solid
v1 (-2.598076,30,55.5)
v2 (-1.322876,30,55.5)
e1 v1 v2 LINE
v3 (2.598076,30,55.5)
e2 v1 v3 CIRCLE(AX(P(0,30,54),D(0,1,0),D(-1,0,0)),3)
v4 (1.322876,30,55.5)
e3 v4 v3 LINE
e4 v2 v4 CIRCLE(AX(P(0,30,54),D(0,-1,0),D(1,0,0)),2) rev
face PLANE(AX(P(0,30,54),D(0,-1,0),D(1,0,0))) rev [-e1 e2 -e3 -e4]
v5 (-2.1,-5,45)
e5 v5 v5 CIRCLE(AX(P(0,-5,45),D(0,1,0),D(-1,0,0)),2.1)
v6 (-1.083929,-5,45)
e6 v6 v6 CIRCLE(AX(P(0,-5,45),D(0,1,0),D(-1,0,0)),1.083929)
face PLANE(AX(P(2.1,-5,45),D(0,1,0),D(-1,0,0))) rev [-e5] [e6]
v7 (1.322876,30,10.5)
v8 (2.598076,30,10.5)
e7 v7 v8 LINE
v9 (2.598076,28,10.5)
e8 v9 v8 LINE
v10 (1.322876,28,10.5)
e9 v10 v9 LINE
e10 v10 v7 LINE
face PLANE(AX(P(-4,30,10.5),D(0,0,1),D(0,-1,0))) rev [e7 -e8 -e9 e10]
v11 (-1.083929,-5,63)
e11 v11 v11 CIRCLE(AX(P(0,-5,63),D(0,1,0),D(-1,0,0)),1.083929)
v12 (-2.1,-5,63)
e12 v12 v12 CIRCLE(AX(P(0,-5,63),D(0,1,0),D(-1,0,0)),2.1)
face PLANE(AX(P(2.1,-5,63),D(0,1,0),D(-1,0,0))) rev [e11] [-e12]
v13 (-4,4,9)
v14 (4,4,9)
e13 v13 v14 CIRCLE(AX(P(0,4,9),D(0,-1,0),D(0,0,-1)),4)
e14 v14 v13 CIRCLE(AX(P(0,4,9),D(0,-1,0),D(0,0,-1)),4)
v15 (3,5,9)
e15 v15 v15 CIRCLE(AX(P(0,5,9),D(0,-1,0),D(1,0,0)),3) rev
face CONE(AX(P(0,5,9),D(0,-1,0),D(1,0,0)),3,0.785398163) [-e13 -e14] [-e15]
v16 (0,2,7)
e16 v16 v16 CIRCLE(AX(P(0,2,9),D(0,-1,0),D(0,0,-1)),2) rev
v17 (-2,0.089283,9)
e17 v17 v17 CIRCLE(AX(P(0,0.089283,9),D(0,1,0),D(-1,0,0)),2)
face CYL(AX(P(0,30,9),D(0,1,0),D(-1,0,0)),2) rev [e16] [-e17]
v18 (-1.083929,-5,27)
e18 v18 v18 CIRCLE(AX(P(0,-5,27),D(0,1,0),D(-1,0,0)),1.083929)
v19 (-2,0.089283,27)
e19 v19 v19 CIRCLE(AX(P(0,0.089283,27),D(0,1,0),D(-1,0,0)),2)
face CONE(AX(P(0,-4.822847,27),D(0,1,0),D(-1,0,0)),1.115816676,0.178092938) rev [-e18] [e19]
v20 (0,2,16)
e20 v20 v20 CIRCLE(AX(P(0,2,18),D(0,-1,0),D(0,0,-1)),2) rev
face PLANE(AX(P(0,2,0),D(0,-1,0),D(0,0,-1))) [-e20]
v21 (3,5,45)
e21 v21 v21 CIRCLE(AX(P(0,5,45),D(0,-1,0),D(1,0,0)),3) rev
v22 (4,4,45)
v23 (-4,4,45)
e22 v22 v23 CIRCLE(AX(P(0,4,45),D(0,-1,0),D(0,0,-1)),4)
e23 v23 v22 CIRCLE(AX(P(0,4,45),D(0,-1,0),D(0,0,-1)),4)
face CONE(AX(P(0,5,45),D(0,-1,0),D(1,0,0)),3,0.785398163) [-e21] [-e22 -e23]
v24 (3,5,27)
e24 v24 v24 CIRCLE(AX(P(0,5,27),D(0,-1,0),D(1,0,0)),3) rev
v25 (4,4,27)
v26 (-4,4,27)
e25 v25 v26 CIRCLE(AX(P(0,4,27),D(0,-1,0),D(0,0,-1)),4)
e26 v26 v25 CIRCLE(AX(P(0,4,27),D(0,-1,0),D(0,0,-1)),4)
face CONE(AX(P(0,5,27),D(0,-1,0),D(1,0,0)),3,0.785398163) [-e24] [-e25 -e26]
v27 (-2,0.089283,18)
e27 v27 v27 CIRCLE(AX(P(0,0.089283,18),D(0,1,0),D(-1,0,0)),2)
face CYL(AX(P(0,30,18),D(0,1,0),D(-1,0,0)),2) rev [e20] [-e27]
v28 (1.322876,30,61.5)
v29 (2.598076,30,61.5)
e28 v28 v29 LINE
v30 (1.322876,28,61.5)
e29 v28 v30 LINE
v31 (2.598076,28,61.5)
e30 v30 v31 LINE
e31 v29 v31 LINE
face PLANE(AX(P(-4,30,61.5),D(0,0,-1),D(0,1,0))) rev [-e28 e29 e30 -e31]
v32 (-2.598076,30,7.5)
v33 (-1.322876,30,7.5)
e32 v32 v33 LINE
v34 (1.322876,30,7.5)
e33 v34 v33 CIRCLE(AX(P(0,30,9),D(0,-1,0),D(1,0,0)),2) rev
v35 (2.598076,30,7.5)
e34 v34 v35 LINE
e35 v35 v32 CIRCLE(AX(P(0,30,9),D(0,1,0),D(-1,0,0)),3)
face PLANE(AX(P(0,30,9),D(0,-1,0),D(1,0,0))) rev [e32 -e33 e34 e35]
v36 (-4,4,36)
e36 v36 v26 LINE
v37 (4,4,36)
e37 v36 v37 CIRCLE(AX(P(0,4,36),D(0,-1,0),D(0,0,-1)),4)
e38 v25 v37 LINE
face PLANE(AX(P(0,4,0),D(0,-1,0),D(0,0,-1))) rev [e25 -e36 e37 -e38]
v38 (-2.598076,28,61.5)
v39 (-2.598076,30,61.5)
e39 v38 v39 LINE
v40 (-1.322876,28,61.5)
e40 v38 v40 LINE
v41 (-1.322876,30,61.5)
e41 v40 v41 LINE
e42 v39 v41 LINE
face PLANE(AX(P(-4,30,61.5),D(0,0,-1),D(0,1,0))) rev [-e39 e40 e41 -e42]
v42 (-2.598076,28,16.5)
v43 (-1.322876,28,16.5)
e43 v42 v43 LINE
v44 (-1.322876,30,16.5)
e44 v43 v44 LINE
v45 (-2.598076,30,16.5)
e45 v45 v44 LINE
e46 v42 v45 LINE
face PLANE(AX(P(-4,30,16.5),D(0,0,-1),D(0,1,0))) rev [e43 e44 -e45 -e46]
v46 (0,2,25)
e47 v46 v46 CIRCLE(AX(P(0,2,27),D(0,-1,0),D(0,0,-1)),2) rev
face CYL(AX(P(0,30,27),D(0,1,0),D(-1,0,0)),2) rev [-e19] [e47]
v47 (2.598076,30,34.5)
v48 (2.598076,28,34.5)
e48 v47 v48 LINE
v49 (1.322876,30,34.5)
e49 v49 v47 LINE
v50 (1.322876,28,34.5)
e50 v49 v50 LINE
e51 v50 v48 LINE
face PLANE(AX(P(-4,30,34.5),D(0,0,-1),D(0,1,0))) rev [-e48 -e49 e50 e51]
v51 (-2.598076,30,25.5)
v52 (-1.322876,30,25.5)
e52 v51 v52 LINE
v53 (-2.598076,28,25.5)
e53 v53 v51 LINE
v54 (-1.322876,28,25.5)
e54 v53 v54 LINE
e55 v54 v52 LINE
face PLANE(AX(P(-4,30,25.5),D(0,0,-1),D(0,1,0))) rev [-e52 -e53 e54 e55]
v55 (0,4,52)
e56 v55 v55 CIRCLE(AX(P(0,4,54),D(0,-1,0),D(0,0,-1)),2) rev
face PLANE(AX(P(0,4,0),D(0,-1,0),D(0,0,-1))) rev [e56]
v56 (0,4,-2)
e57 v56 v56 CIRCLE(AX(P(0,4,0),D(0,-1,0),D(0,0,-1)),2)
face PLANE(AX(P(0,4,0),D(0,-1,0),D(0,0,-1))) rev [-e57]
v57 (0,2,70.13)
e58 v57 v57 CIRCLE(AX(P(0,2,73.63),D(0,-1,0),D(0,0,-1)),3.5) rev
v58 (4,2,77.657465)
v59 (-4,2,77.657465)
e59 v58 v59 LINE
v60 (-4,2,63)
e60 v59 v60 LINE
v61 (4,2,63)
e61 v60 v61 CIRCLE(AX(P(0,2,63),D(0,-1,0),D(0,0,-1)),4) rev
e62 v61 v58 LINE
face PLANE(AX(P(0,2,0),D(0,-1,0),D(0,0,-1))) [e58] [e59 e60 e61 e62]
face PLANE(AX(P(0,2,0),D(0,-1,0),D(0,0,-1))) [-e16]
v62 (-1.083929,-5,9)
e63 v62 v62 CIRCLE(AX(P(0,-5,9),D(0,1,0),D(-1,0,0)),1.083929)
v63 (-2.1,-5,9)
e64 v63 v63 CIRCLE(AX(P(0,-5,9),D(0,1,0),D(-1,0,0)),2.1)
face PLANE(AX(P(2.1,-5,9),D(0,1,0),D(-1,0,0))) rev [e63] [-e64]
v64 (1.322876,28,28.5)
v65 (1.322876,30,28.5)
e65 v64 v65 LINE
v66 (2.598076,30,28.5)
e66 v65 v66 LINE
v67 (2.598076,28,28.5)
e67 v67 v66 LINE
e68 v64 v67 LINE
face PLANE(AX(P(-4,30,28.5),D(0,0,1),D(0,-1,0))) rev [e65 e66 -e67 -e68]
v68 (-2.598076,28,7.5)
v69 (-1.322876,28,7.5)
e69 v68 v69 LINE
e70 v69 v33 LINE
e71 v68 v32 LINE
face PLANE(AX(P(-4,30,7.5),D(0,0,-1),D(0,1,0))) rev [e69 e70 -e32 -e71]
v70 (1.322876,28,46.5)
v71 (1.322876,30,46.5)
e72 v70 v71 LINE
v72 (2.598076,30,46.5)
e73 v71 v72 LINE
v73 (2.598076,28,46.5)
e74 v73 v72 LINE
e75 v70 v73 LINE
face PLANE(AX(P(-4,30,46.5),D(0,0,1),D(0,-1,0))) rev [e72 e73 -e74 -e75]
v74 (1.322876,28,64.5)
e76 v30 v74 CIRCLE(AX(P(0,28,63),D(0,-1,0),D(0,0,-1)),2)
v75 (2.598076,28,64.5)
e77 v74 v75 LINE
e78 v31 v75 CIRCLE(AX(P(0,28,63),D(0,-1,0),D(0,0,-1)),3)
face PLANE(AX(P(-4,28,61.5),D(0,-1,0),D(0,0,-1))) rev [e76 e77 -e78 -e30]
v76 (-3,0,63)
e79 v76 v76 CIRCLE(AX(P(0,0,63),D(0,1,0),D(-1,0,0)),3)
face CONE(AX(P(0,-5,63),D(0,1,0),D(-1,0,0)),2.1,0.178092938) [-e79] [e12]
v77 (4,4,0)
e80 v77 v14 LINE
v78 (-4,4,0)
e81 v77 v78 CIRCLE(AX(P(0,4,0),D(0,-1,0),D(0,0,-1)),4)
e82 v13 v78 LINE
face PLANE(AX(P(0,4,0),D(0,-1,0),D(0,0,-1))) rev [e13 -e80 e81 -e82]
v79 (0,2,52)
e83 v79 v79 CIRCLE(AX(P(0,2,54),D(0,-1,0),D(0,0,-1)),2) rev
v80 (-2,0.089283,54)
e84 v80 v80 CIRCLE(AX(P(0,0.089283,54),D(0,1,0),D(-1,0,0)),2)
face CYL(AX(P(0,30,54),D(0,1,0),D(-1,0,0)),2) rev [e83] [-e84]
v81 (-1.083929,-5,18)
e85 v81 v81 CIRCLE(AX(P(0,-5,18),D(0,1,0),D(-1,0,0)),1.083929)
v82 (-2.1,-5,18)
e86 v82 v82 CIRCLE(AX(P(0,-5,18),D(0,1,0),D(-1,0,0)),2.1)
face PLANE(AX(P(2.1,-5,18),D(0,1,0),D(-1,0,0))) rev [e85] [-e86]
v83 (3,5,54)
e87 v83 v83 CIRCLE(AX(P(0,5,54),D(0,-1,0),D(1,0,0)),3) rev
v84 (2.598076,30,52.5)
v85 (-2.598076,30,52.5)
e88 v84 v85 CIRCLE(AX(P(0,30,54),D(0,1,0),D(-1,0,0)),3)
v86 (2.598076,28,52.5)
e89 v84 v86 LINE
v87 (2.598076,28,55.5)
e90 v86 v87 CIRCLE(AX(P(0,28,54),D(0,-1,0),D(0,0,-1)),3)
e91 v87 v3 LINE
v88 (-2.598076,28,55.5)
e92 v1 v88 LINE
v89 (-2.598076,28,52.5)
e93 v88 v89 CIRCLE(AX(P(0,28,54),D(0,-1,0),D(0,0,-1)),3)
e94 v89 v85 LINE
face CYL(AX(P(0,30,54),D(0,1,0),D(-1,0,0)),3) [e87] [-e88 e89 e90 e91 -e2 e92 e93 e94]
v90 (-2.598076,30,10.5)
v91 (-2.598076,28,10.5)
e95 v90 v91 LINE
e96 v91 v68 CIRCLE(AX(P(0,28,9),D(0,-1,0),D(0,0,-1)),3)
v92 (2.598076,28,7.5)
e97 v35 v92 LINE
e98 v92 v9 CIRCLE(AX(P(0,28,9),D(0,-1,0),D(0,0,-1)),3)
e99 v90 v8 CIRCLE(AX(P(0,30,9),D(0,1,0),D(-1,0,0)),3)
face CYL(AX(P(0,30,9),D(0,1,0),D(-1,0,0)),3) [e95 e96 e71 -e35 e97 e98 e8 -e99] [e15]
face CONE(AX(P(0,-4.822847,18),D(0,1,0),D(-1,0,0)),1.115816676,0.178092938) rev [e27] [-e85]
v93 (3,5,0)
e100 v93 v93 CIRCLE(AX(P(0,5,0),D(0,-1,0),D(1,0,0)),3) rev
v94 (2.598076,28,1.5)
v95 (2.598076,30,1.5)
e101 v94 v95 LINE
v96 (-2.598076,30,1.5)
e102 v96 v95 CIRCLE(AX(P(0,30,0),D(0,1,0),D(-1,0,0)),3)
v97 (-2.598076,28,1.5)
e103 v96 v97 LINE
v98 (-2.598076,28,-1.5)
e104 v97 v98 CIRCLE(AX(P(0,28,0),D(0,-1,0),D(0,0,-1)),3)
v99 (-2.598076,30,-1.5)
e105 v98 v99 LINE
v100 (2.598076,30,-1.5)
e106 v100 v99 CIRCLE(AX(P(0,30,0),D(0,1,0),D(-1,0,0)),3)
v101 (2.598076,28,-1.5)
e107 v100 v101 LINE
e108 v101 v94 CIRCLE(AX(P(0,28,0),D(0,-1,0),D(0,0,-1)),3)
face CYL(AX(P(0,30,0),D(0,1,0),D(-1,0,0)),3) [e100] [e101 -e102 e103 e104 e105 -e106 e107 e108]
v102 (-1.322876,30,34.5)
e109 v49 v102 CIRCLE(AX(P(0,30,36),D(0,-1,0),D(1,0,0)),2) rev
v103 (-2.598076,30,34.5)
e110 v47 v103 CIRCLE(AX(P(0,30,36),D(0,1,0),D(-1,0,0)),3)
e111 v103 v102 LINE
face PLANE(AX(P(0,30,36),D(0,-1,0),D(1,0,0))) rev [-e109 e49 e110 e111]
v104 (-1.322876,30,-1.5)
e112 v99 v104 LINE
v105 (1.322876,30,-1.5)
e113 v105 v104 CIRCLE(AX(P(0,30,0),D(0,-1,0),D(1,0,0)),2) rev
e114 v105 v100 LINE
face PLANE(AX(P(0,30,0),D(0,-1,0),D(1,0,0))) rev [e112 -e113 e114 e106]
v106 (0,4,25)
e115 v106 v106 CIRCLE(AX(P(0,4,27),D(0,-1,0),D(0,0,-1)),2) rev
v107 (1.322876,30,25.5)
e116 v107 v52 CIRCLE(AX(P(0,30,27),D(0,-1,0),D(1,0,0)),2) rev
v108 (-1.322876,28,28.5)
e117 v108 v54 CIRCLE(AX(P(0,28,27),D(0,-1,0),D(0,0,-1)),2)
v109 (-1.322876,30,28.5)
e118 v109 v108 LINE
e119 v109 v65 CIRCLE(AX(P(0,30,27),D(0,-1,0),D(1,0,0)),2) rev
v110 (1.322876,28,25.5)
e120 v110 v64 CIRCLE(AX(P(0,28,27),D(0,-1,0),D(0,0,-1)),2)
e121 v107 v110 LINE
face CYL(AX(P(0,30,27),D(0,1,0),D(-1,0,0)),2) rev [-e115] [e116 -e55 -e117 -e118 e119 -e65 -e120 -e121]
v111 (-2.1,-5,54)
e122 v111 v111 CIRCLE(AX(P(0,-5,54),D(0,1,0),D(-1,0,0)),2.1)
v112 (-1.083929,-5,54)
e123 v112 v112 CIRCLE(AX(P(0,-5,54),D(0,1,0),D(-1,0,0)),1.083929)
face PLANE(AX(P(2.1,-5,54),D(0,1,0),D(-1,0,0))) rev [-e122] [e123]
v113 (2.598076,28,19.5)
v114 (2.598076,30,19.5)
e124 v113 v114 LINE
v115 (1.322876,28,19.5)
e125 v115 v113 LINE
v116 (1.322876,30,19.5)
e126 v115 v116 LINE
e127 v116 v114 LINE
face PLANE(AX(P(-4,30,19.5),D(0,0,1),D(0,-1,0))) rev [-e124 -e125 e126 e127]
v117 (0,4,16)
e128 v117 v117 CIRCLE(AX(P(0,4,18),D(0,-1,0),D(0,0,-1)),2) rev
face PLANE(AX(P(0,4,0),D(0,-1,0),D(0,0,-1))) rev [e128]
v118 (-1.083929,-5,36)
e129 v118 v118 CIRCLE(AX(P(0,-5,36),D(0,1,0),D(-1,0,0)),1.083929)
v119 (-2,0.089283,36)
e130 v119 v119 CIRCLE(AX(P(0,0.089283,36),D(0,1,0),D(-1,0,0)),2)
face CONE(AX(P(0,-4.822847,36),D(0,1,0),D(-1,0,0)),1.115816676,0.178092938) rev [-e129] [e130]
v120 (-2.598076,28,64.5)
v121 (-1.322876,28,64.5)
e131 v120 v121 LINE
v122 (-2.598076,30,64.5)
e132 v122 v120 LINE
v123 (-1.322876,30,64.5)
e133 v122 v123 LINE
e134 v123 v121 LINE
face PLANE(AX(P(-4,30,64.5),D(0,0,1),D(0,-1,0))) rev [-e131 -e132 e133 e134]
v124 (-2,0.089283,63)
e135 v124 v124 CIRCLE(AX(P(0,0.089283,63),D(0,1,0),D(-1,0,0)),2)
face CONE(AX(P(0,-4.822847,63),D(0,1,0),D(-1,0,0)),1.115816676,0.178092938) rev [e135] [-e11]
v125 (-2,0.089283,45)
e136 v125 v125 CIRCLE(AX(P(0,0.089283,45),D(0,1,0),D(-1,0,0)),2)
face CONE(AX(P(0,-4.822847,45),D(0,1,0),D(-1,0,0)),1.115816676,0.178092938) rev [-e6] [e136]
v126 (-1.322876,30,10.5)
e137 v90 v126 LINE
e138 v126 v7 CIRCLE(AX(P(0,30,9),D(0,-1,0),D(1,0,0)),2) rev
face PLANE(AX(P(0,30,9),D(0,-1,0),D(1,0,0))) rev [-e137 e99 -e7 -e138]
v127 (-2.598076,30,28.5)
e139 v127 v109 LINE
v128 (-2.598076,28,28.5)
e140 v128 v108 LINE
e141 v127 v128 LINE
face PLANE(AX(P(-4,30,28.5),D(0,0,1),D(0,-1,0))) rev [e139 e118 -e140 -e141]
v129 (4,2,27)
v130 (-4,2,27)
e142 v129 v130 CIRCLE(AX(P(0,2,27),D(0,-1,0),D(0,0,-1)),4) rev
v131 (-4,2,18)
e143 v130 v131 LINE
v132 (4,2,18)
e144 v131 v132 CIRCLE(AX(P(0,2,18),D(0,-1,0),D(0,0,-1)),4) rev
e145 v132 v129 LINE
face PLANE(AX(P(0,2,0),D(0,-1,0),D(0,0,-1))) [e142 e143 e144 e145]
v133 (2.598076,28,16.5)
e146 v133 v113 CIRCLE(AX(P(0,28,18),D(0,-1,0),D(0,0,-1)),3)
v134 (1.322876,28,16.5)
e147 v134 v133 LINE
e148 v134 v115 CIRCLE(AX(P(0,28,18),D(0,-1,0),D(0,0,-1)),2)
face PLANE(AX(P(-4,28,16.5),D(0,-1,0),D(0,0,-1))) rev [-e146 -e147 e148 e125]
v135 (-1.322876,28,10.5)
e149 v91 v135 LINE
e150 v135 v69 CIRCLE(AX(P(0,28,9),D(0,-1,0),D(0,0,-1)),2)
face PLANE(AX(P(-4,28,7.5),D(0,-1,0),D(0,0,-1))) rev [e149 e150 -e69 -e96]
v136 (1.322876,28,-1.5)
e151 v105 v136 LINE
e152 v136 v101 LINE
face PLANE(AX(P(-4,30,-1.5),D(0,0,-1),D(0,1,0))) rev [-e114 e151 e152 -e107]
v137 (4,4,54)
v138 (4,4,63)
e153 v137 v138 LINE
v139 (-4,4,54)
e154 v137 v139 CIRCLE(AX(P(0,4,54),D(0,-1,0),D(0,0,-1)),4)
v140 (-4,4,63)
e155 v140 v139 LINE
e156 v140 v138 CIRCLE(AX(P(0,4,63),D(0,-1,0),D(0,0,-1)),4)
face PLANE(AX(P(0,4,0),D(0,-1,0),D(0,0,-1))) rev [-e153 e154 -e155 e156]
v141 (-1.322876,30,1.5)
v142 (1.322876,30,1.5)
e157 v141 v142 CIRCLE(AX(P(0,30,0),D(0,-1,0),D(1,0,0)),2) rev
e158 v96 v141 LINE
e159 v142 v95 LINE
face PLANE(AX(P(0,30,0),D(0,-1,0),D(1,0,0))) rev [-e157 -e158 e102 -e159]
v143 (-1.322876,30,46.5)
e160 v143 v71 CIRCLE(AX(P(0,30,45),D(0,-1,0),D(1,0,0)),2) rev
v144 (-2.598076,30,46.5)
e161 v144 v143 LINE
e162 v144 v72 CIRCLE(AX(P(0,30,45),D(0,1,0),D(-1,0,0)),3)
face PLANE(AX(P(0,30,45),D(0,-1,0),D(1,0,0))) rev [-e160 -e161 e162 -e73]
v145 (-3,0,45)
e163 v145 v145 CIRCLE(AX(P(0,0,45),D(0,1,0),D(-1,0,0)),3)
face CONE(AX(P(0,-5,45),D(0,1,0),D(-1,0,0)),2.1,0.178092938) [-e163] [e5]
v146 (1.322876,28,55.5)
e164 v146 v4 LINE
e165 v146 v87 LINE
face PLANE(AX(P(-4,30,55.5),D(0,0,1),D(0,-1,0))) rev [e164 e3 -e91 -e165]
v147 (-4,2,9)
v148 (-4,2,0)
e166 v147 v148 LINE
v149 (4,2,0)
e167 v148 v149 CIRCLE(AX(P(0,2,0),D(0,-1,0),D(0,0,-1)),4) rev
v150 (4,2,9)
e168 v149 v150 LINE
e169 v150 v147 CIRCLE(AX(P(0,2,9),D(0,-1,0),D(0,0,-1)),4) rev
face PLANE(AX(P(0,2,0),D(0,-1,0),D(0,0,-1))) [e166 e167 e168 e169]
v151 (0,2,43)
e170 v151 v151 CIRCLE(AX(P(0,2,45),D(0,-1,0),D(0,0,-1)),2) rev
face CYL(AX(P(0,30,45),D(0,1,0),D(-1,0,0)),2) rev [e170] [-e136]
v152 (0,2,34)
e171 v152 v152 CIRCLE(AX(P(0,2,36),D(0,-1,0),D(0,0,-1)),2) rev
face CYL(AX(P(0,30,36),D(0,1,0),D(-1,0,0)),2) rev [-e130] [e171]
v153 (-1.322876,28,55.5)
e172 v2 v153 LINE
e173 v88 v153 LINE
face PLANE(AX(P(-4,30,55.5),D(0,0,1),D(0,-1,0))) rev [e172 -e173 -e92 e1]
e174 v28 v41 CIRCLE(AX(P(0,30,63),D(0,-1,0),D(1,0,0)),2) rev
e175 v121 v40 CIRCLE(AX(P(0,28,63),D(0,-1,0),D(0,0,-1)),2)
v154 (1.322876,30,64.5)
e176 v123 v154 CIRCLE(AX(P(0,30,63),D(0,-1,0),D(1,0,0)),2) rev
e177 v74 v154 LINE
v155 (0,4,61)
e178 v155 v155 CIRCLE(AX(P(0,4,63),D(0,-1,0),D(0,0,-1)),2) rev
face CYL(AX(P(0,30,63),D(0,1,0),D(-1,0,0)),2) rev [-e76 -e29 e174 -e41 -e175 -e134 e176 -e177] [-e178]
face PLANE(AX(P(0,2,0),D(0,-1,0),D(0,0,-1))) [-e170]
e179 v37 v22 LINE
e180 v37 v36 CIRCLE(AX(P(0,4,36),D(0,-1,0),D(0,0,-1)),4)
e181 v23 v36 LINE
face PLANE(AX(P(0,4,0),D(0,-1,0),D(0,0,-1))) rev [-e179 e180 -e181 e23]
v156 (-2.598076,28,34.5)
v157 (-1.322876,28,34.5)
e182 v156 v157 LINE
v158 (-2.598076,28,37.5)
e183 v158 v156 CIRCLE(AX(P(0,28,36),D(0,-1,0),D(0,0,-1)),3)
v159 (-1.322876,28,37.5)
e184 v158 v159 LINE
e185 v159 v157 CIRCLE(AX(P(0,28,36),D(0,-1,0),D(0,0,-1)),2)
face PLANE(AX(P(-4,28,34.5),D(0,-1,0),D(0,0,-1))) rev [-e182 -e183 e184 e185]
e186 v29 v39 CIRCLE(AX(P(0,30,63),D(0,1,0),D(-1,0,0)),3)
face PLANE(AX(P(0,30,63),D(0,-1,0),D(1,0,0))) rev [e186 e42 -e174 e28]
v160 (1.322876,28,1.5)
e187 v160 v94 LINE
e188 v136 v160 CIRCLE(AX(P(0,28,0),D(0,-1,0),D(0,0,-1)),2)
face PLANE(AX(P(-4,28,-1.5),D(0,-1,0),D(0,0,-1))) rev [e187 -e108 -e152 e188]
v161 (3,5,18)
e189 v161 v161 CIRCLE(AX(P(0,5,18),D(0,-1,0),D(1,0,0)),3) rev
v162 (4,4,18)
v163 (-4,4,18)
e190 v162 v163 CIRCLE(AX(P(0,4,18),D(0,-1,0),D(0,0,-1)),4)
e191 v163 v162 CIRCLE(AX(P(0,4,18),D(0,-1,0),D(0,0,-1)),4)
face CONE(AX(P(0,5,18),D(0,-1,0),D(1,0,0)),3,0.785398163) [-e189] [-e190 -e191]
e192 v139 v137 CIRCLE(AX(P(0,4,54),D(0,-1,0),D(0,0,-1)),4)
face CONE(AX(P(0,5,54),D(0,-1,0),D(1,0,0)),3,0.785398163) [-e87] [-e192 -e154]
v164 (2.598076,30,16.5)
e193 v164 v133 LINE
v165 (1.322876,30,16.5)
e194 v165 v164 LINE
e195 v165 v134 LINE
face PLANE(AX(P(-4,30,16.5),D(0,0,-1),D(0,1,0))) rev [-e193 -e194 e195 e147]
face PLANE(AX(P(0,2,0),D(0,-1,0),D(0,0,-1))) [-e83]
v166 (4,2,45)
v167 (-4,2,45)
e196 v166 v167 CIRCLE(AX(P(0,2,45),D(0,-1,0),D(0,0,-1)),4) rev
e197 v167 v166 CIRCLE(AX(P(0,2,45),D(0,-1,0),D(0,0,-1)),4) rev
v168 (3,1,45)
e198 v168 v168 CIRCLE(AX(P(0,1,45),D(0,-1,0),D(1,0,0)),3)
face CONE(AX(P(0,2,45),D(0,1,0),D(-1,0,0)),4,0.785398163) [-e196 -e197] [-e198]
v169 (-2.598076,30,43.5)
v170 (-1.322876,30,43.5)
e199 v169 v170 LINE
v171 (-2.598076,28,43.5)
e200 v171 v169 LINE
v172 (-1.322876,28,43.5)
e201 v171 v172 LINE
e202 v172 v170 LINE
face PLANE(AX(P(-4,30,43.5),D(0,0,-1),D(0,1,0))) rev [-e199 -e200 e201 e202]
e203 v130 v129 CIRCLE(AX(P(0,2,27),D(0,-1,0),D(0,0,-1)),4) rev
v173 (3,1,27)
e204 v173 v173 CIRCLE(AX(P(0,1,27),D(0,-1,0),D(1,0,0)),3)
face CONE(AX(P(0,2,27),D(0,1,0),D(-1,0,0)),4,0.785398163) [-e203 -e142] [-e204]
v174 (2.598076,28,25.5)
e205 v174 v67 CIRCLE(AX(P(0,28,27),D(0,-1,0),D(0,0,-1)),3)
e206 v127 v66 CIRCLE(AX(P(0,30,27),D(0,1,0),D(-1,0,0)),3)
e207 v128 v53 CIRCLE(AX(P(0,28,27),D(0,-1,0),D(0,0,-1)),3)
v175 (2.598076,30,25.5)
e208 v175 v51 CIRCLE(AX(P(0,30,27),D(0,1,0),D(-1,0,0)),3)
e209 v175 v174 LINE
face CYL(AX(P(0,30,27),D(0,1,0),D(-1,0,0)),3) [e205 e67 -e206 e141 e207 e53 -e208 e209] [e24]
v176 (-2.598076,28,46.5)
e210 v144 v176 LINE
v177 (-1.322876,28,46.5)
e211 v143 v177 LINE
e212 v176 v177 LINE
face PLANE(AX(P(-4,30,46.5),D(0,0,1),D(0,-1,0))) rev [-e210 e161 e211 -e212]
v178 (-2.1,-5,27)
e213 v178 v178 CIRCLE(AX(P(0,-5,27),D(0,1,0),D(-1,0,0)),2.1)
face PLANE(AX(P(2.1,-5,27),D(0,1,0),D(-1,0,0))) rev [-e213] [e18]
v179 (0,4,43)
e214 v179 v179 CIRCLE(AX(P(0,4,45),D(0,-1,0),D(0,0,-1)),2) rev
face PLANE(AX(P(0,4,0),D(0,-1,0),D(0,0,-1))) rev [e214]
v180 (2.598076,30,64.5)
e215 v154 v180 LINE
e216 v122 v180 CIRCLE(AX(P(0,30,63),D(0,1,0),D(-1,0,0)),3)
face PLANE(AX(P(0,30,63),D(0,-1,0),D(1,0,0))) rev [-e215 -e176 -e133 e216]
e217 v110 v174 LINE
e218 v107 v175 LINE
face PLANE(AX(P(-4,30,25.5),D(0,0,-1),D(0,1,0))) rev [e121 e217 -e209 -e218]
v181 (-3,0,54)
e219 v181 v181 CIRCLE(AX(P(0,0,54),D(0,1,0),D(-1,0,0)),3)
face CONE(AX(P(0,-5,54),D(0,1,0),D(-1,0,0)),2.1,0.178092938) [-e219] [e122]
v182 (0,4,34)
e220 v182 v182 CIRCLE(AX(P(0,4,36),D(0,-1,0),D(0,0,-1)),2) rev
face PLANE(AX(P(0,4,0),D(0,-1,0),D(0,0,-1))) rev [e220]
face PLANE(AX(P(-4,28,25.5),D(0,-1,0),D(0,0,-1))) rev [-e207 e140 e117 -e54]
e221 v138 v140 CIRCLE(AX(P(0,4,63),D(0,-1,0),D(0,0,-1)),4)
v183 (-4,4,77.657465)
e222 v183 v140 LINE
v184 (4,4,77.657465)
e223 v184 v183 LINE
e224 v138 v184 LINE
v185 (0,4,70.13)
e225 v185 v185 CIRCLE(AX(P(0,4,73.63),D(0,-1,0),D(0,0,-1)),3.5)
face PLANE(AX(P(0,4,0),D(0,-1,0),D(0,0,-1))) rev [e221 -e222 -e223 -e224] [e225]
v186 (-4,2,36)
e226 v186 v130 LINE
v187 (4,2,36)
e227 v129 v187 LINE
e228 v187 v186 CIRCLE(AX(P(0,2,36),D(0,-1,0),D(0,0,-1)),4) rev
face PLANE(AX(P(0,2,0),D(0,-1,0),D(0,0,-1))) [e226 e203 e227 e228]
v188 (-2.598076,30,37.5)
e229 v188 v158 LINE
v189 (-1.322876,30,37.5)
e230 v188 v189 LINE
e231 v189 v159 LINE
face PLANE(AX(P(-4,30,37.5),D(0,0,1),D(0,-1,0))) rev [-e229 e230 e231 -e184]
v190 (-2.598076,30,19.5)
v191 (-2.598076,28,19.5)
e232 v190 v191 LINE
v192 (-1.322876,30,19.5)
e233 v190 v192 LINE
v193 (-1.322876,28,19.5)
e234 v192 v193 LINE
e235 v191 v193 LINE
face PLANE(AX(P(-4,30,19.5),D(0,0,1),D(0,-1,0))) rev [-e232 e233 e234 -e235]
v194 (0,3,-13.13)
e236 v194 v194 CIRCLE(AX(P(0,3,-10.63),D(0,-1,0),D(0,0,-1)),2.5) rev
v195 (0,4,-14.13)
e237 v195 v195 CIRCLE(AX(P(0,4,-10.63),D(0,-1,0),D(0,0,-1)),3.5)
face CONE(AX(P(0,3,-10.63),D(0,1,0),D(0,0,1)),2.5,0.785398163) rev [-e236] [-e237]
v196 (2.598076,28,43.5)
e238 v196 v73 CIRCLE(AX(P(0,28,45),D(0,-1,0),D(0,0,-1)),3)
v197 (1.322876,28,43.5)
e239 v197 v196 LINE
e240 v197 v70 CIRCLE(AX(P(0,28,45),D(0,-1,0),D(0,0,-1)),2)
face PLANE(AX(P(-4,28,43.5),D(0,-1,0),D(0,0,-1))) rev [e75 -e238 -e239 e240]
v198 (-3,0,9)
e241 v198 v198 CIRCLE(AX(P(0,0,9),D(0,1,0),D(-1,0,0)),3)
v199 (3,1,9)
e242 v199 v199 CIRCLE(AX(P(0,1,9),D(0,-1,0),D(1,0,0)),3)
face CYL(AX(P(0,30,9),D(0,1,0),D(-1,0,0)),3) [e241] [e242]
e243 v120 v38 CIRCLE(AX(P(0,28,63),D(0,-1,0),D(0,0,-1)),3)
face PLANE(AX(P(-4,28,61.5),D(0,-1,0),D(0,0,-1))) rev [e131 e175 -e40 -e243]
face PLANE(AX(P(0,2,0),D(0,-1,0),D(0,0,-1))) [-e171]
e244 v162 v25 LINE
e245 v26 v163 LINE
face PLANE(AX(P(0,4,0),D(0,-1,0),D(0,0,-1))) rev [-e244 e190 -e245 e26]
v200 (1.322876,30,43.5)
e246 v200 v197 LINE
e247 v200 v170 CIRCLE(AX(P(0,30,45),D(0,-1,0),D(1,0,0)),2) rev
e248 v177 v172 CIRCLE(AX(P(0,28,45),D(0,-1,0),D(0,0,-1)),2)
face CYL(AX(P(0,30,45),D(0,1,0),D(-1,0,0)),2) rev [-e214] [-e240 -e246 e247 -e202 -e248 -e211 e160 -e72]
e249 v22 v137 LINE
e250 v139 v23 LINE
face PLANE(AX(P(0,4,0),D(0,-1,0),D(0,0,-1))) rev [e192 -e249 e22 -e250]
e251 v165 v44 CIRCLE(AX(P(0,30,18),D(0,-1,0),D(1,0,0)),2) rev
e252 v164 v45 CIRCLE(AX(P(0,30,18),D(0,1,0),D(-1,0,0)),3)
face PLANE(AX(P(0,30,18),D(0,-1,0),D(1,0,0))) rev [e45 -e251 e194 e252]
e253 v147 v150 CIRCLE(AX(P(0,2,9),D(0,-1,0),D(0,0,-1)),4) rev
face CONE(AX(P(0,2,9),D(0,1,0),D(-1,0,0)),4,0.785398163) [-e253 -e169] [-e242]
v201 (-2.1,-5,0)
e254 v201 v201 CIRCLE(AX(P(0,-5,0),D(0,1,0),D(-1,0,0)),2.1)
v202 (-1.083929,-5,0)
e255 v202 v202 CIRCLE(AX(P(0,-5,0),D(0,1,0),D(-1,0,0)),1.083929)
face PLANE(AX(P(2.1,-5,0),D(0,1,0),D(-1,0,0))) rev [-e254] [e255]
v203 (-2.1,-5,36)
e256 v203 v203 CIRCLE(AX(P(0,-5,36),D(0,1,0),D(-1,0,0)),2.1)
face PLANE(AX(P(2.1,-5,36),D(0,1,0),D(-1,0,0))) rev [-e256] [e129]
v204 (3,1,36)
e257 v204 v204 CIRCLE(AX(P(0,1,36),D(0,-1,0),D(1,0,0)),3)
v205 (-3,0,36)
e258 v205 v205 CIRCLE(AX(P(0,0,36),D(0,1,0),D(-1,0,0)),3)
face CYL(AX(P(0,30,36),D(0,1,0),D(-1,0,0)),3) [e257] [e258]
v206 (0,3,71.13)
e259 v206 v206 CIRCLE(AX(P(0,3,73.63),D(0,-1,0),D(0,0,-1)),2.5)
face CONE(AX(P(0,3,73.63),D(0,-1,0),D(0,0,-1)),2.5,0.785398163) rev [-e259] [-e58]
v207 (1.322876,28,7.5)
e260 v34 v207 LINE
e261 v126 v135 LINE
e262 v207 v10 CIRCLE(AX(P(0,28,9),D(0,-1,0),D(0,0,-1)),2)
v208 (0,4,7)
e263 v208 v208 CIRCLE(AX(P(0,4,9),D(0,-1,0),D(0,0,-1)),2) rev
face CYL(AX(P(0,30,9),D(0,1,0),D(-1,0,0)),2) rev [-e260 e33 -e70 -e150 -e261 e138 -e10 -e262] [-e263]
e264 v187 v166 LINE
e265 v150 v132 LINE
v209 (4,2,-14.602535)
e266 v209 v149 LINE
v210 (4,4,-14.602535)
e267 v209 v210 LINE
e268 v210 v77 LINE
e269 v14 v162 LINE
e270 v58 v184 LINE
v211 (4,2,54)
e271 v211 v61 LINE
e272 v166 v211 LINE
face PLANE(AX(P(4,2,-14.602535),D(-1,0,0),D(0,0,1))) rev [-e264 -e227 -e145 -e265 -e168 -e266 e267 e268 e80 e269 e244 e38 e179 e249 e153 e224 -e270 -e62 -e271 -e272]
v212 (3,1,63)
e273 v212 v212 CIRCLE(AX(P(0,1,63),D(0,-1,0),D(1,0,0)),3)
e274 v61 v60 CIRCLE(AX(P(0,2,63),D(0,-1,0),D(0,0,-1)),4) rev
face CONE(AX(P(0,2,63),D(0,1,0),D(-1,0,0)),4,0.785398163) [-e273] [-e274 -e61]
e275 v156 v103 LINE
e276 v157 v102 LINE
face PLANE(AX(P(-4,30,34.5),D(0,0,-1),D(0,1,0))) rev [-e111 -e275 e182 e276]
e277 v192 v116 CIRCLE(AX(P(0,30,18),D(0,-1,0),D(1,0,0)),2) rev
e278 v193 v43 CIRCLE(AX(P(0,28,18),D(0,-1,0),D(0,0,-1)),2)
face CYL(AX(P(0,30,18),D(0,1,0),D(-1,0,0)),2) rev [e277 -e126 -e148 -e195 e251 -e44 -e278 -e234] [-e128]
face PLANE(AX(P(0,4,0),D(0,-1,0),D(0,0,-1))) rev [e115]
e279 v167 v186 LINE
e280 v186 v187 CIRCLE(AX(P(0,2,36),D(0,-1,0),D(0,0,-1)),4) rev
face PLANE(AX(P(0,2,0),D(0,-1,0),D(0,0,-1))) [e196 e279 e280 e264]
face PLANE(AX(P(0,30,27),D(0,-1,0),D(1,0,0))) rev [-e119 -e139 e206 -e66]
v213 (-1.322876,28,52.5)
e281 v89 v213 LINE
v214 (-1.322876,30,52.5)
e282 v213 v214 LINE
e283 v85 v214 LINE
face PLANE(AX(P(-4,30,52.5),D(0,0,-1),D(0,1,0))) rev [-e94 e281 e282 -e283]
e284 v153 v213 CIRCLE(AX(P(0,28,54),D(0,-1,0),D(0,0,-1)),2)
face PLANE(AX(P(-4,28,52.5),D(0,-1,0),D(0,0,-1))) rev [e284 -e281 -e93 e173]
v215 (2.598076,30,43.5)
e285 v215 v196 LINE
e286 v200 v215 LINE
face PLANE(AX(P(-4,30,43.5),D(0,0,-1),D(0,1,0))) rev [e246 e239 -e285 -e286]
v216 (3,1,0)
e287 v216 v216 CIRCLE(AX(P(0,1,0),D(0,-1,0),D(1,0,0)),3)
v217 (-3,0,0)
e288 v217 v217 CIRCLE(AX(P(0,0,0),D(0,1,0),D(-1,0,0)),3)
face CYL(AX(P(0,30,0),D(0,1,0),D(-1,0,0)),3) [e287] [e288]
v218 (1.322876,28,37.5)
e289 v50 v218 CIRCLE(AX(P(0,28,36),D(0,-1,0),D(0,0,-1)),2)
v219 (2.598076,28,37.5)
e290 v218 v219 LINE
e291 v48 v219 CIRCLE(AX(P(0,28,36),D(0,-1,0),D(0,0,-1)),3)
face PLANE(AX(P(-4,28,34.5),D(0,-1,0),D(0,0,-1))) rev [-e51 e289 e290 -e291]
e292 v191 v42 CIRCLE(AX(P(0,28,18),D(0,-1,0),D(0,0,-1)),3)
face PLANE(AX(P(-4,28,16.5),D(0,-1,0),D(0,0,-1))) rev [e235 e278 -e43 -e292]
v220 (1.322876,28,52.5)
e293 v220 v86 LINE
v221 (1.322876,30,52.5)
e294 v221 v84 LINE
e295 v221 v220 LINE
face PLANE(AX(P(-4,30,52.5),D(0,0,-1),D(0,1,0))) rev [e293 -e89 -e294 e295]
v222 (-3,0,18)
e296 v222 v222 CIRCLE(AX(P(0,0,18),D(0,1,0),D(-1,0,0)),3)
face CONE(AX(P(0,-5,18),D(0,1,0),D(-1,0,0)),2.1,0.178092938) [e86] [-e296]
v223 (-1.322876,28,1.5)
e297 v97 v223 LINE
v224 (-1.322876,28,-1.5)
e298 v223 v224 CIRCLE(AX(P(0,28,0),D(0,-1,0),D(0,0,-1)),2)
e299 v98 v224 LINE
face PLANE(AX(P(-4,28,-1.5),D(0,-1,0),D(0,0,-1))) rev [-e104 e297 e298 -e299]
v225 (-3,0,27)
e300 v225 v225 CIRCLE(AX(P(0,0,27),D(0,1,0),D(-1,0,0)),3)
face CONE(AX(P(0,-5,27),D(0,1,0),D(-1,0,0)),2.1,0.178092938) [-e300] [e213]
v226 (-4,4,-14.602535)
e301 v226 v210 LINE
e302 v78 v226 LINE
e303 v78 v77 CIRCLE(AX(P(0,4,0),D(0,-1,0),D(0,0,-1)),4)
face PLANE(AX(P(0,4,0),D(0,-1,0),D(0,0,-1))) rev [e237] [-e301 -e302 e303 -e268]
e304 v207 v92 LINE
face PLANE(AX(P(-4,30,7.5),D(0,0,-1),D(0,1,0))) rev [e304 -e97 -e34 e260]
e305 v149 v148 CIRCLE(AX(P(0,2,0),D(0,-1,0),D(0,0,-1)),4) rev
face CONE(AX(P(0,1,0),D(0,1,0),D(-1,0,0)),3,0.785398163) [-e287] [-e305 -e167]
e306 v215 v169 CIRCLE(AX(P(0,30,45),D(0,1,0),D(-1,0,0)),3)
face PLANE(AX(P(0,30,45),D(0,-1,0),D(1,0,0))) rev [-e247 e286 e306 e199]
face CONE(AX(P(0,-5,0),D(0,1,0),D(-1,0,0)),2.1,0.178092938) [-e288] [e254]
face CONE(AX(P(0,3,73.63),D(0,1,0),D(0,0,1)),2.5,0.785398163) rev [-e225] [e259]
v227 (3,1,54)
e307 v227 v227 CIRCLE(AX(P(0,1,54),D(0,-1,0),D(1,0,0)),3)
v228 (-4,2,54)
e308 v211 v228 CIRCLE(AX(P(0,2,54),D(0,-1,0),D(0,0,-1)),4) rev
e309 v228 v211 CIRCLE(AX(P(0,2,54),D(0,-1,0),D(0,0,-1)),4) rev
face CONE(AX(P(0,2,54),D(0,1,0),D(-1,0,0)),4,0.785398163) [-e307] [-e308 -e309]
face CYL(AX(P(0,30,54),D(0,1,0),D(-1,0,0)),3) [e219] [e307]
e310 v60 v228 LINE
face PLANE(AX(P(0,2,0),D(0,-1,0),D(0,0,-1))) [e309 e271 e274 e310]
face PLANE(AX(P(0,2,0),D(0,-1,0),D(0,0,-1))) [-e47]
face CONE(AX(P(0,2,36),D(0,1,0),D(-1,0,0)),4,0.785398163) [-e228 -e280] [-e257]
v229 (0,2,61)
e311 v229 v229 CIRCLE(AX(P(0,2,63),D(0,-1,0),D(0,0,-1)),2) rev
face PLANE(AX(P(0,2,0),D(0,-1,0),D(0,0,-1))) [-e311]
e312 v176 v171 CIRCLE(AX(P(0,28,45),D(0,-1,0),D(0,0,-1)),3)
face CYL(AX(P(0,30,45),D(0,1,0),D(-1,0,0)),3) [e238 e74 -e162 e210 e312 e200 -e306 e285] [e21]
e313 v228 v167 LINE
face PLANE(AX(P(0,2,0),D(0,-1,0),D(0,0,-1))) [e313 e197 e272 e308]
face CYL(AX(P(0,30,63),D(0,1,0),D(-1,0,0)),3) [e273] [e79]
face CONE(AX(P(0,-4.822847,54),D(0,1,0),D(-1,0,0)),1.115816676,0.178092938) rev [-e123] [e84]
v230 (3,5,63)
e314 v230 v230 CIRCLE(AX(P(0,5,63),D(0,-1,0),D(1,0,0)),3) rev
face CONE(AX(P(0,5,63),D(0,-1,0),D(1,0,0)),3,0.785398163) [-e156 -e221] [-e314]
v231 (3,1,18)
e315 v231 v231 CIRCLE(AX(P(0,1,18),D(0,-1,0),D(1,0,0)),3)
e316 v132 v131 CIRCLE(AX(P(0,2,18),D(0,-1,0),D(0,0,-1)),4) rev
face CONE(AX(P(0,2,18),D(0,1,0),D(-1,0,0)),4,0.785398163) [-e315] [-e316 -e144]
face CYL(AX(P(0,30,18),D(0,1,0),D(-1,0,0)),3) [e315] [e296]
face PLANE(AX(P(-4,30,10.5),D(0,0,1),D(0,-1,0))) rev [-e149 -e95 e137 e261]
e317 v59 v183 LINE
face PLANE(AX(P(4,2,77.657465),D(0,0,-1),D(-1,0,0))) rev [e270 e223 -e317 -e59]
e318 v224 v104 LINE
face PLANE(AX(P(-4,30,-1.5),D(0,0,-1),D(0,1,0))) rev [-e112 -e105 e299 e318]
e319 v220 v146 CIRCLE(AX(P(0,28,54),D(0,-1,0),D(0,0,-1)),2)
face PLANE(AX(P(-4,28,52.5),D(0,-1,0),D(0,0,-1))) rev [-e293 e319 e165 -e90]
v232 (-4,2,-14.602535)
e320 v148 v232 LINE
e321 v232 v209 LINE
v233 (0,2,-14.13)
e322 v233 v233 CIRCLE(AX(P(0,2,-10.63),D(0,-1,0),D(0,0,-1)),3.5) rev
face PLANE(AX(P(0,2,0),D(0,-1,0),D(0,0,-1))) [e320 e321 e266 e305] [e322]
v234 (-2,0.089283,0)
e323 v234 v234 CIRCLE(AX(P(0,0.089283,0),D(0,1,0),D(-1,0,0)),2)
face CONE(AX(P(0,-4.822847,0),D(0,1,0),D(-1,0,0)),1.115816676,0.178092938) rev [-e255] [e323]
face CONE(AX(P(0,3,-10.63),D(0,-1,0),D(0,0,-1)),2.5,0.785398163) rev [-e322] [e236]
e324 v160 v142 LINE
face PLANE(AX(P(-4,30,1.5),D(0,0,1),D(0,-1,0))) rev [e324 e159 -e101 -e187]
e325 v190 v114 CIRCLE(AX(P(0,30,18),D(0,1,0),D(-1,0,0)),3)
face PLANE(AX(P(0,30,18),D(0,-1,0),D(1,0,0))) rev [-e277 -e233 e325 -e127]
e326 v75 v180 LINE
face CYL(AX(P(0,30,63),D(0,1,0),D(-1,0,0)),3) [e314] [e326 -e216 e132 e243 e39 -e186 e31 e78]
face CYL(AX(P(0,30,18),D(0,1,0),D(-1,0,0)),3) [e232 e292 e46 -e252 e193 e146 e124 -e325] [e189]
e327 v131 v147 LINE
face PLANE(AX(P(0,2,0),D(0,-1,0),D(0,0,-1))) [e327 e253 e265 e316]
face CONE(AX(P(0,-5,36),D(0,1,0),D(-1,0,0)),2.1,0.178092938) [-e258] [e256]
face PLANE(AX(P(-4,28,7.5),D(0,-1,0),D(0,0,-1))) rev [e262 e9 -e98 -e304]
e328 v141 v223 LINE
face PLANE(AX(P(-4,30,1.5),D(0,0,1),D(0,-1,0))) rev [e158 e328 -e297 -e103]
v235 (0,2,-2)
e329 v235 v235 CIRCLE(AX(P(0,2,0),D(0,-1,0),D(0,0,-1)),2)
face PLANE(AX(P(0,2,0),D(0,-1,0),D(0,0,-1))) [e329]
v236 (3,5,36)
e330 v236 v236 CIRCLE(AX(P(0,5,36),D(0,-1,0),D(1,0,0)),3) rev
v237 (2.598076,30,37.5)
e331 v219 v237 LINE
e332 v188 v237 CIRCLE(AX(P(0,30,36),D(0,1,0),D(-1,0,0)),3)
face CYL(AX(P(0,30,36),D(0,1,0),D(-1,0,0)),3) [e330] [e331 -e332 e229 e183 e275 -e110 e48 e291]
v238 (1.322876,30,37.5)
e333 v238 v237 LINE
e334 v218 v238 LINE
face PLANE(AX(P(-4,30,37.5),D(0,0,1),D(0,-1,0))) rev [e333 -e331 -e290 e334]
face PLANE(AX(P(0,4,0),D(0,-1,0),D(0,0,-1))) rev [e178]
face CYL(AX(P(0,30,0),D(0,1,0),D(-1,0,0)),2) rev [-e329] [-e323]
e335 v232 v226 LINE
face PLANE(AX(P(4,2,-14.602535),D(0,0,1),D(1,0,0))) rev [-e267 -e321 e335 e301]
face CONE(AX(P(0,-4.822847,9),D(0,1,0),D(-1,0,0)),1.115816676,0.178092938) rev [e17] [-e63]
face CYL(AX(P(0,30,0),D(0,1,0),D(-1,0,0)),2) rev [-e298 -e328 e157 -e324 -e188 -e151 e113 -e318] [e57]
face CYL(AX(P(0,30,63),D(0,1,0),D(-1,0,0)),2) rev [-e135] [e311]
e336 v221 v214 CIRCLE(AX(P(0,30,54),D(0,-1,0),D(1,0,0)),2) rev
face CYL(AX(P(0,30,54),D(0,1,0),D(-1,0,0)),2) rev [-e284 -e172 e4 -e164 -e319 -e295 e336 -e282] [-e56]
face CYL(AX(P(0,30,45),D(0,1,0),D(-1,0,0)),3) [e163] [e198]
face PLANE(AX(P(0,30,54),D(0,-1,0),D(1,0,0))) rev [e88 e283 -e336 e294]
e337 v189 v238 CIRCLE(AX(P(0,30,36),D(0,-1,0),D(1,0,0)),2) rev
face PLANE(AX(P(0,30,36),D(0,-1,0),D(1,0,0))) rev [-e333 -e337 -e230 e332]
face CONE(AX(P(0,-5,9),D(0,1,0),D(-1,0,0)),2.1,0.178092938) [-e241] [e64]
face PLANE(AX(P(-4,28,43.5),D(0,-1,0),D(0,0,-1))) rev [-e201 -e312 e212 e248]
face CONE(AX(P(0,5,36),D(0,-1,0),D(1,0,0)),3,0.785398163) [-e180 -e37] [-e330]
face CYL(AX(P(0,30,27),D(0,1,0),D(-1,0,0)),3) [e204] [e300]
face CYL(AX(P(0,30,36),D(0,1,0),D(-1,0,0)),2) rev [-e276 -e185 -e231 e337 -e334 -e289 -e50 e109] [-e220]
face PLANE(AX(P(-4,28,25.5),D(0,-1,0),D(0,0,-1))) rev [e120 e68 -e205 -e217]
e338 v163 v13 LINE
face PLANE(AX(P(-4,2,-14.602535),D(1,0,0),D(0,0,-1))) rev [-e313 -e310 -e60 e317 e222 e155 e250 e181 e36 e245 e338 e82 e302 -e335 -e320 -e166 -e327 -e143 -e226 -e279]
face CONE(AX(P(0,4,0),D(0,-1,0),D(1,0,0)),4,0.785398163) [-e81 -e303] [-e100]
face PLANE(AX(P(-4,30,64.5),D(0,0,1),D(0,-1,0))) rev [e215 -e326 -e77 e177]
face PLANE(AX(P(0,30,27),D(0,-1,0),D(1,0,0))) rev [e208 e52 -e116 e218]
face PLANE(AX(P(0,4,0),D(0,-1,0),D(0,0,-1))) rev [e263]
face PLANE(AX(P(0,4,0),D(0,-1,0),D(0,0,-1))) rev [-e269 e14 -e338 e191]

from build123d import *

# Parameters (mm, degrees)
SHELL1_T            = -1
LPATTERN1_COUNT     = 8
LPATTERN1_PITCH     = 9
SKETCH3_W           = 8
SKETCH3_H           = 92.26
BOSS_EXTRUDE1_DEPTH = 1
CHAMFER1_SIZE       = 1
SKETCH4_R           = 2.5
CUT_EXTRUDE1_DEPTH  = 82.991962069
CHAMFER2_SIZE       = 1
SKETCH5_W           = 3
SKETCH5_H           = 2
CUT_EXTRUDE2_DEPTH  = 84.346756649
LPATTERN2_COUNT     = 8
LPATTERN2_PITCH     = 9


with BuildPart() as part:
    # Sketch1 → Revolve1 (revolve)
    with BuildSketch(Plane.XY, mode=Mode.PRIVATE) as revolve1_sk:
        Polygon((0, 30), (3, 30), (3, 0), (2.1, -5), (0, -5), align=None)
    revolve(revolve1_sk.sketch.rotate(Axis((0, 30, 0), (0, -1, 0)), 180), axis=Axis((0, 30, 0), (0, -1, 0)))

    # Shell1
    shell1_openings = [part.faces().sort_by_distance(p)[0] for p in [
        (0, -5, 0),
        (0, 30, 0),
    ]]
    offset(amount=SHELL1_T, openings=shell1_openings, kind=Kind.INTERSECTION)


with BuildPart() as lpattern1_1:
    # LPattern1: pattern copy
    add(part.part.moved(Location(Vector(0, 0, 1) * (1 * LPATTERN1_PITCH))))


with BuildPart() as lpattern1_2:
    # LPattern1: pattern copy
    add(part.part.moved(Location(Vector(0, 0, 1) * (2 * LPATTERN1_PITCH))))


with BuildPart() as lpattern1_3:
    # LPattern1: pattern copy
    add(part.part.moved(Location(Vector(0, 0, 1) * (3 * LPATTERN1_PITCH))))


with BuildPart() as lpattern1_4:
    # LPattern1: pattern copy
    add(part.part.moved(Location(Vector(0, 0, 1) * (4 * LPATTERN1_PITCH))))


with BuildPart() as lpattern1_5:
    # LPattern1: pattern copy
    add(part.part.moved(Location(Vector(0, 0, 1) * (5 * LPATTERN1_PITCH))))


with BuildPart() as lpattern1_6:
    # LPattern1: pattern copy
    add(part.part.moved(Location(Vector(0, 0, 1) * (6 * LPATTERN1_PITCH))))


with BuildPart() as lpattern1_7:
    # LPattern1: pattern copy
    add(part.part.moved(Location(Vector(0, 0, 1) * (7 * LPATTERN1_PITCH))))


with BuildPart() as part_1:
    add(part.part)

    add(lpattern1_1.part)  # Boss-Extrude1 merges LPattern1_1

    add(lpattern1_2.part)  # Boss-Extrude1 merges LPattern1_2

    add(lpattern1_3.part)  # Boss-Extrude1 merges LPattern1_3

    add(lpattern1_4.part)  # Boss-Extrude1 merges LPattern1_4

    add(lpattern1_5.part)  # Boss-Extrude1 merges LPattern1_5

    add(lpattern1_6.part)  # Boss-Extrude1 merges LPattern1_6

    add(lpattern1_7.part)  # Boss-Extrude1 merges LPattern1_7
    # Sketch3 → Boss-Extrude1 (add, symmetric)
    with BuildSketch(Plane(origin=(0, 3, 0), x_dir=(-1, 0, 0), z_dir=(0, -1, 0))):
        with Locations((0, -31.527464831)):
            Rectangle(SKETCH3_W, SKETCH3_H)
    extrude(amount=BOSS_EXTRUDE1_DEPTH, both=True)

    # Chamfer1
    chamfer1_edges = [part_1.edges().sort_by_distance(p)[0] for p in [
        (3, 4, 0),
        (3, 2, 0),
        (3, 4, 9),
        (3, 2, 9),
        (3, 4, 18),
        (3, 2, 18),
        (3, 4, 27),
        (3, 2, 27),
        (3, 4, 36),
        (3, 2, 36),
        (3, 4, 45),
        (3, 2, 45),
        (3, 4, 54),
        (3, 2, 54),
        (3, 4, 63),
        (3, 2, 63),
    ]]
    chamfer(chamfer1_edges, length=CHAMFER1_SIZE - 0.0001)  # a hair under: the kernel refuses the full size

    # Sketch4 → Cut-Extrude1 (cut, through all)
    with BuildSketch(Plane(origin=(0, 4, 0), x_dir=(1, 0, 0), z_dir=(0, 1, 0))):
        with Locations(Location((0, -73.63, 0), (0, 0, 270))):
            Circle(SKETCH4_R)
        with Locations(Location((0, 10.63, 0), (0, 0, 270))):
            Circle(SKETCH4_R)
    extrude(amount=-CUT_EXTRUDE1_DEPTH, mode=Mode.SUBTRACT)

    # Chamfer2
    chamfer2_edges = [part_1.edges().sort_by_distance(p)[0] for p in [
        (0, 2, 71.13),
        (0, 4, 71.13),
        (0, 2, -13.13),
        (0, 4, -13.13),
    ]]
    chamfer(chamfer2_edges, length=CHAMFER2_SIZE - 0.0001)  # a hair under: the kernel refuses the full size

    # Sketch5 → Cut-Extrude2 (cut, symmetric)
    with BuildSketch(Plane(origin=(0, 0, 0), x_dir=(0, 0, -1), z_dir=(1, 0, 0))):
        with Locations((0, 29)):
            Rectangle(SKETCH5_W, SKETCH5_H)
    cut_extrude2 = extrude(amount=CUT_EXTRUDE2_DEPTH, both=True, mode=Mode.SUBTRACT)

    # LPattern2: Cut-Extrude2 ×8
    with Locations(*[(0, 0, i * LPATTERN2_PITCH) for i in range(1, LPATTERN2_COUNT)]):
        add(cut_extrude2, mode=Mode.SUBTRACT)


solid = part_1.part
